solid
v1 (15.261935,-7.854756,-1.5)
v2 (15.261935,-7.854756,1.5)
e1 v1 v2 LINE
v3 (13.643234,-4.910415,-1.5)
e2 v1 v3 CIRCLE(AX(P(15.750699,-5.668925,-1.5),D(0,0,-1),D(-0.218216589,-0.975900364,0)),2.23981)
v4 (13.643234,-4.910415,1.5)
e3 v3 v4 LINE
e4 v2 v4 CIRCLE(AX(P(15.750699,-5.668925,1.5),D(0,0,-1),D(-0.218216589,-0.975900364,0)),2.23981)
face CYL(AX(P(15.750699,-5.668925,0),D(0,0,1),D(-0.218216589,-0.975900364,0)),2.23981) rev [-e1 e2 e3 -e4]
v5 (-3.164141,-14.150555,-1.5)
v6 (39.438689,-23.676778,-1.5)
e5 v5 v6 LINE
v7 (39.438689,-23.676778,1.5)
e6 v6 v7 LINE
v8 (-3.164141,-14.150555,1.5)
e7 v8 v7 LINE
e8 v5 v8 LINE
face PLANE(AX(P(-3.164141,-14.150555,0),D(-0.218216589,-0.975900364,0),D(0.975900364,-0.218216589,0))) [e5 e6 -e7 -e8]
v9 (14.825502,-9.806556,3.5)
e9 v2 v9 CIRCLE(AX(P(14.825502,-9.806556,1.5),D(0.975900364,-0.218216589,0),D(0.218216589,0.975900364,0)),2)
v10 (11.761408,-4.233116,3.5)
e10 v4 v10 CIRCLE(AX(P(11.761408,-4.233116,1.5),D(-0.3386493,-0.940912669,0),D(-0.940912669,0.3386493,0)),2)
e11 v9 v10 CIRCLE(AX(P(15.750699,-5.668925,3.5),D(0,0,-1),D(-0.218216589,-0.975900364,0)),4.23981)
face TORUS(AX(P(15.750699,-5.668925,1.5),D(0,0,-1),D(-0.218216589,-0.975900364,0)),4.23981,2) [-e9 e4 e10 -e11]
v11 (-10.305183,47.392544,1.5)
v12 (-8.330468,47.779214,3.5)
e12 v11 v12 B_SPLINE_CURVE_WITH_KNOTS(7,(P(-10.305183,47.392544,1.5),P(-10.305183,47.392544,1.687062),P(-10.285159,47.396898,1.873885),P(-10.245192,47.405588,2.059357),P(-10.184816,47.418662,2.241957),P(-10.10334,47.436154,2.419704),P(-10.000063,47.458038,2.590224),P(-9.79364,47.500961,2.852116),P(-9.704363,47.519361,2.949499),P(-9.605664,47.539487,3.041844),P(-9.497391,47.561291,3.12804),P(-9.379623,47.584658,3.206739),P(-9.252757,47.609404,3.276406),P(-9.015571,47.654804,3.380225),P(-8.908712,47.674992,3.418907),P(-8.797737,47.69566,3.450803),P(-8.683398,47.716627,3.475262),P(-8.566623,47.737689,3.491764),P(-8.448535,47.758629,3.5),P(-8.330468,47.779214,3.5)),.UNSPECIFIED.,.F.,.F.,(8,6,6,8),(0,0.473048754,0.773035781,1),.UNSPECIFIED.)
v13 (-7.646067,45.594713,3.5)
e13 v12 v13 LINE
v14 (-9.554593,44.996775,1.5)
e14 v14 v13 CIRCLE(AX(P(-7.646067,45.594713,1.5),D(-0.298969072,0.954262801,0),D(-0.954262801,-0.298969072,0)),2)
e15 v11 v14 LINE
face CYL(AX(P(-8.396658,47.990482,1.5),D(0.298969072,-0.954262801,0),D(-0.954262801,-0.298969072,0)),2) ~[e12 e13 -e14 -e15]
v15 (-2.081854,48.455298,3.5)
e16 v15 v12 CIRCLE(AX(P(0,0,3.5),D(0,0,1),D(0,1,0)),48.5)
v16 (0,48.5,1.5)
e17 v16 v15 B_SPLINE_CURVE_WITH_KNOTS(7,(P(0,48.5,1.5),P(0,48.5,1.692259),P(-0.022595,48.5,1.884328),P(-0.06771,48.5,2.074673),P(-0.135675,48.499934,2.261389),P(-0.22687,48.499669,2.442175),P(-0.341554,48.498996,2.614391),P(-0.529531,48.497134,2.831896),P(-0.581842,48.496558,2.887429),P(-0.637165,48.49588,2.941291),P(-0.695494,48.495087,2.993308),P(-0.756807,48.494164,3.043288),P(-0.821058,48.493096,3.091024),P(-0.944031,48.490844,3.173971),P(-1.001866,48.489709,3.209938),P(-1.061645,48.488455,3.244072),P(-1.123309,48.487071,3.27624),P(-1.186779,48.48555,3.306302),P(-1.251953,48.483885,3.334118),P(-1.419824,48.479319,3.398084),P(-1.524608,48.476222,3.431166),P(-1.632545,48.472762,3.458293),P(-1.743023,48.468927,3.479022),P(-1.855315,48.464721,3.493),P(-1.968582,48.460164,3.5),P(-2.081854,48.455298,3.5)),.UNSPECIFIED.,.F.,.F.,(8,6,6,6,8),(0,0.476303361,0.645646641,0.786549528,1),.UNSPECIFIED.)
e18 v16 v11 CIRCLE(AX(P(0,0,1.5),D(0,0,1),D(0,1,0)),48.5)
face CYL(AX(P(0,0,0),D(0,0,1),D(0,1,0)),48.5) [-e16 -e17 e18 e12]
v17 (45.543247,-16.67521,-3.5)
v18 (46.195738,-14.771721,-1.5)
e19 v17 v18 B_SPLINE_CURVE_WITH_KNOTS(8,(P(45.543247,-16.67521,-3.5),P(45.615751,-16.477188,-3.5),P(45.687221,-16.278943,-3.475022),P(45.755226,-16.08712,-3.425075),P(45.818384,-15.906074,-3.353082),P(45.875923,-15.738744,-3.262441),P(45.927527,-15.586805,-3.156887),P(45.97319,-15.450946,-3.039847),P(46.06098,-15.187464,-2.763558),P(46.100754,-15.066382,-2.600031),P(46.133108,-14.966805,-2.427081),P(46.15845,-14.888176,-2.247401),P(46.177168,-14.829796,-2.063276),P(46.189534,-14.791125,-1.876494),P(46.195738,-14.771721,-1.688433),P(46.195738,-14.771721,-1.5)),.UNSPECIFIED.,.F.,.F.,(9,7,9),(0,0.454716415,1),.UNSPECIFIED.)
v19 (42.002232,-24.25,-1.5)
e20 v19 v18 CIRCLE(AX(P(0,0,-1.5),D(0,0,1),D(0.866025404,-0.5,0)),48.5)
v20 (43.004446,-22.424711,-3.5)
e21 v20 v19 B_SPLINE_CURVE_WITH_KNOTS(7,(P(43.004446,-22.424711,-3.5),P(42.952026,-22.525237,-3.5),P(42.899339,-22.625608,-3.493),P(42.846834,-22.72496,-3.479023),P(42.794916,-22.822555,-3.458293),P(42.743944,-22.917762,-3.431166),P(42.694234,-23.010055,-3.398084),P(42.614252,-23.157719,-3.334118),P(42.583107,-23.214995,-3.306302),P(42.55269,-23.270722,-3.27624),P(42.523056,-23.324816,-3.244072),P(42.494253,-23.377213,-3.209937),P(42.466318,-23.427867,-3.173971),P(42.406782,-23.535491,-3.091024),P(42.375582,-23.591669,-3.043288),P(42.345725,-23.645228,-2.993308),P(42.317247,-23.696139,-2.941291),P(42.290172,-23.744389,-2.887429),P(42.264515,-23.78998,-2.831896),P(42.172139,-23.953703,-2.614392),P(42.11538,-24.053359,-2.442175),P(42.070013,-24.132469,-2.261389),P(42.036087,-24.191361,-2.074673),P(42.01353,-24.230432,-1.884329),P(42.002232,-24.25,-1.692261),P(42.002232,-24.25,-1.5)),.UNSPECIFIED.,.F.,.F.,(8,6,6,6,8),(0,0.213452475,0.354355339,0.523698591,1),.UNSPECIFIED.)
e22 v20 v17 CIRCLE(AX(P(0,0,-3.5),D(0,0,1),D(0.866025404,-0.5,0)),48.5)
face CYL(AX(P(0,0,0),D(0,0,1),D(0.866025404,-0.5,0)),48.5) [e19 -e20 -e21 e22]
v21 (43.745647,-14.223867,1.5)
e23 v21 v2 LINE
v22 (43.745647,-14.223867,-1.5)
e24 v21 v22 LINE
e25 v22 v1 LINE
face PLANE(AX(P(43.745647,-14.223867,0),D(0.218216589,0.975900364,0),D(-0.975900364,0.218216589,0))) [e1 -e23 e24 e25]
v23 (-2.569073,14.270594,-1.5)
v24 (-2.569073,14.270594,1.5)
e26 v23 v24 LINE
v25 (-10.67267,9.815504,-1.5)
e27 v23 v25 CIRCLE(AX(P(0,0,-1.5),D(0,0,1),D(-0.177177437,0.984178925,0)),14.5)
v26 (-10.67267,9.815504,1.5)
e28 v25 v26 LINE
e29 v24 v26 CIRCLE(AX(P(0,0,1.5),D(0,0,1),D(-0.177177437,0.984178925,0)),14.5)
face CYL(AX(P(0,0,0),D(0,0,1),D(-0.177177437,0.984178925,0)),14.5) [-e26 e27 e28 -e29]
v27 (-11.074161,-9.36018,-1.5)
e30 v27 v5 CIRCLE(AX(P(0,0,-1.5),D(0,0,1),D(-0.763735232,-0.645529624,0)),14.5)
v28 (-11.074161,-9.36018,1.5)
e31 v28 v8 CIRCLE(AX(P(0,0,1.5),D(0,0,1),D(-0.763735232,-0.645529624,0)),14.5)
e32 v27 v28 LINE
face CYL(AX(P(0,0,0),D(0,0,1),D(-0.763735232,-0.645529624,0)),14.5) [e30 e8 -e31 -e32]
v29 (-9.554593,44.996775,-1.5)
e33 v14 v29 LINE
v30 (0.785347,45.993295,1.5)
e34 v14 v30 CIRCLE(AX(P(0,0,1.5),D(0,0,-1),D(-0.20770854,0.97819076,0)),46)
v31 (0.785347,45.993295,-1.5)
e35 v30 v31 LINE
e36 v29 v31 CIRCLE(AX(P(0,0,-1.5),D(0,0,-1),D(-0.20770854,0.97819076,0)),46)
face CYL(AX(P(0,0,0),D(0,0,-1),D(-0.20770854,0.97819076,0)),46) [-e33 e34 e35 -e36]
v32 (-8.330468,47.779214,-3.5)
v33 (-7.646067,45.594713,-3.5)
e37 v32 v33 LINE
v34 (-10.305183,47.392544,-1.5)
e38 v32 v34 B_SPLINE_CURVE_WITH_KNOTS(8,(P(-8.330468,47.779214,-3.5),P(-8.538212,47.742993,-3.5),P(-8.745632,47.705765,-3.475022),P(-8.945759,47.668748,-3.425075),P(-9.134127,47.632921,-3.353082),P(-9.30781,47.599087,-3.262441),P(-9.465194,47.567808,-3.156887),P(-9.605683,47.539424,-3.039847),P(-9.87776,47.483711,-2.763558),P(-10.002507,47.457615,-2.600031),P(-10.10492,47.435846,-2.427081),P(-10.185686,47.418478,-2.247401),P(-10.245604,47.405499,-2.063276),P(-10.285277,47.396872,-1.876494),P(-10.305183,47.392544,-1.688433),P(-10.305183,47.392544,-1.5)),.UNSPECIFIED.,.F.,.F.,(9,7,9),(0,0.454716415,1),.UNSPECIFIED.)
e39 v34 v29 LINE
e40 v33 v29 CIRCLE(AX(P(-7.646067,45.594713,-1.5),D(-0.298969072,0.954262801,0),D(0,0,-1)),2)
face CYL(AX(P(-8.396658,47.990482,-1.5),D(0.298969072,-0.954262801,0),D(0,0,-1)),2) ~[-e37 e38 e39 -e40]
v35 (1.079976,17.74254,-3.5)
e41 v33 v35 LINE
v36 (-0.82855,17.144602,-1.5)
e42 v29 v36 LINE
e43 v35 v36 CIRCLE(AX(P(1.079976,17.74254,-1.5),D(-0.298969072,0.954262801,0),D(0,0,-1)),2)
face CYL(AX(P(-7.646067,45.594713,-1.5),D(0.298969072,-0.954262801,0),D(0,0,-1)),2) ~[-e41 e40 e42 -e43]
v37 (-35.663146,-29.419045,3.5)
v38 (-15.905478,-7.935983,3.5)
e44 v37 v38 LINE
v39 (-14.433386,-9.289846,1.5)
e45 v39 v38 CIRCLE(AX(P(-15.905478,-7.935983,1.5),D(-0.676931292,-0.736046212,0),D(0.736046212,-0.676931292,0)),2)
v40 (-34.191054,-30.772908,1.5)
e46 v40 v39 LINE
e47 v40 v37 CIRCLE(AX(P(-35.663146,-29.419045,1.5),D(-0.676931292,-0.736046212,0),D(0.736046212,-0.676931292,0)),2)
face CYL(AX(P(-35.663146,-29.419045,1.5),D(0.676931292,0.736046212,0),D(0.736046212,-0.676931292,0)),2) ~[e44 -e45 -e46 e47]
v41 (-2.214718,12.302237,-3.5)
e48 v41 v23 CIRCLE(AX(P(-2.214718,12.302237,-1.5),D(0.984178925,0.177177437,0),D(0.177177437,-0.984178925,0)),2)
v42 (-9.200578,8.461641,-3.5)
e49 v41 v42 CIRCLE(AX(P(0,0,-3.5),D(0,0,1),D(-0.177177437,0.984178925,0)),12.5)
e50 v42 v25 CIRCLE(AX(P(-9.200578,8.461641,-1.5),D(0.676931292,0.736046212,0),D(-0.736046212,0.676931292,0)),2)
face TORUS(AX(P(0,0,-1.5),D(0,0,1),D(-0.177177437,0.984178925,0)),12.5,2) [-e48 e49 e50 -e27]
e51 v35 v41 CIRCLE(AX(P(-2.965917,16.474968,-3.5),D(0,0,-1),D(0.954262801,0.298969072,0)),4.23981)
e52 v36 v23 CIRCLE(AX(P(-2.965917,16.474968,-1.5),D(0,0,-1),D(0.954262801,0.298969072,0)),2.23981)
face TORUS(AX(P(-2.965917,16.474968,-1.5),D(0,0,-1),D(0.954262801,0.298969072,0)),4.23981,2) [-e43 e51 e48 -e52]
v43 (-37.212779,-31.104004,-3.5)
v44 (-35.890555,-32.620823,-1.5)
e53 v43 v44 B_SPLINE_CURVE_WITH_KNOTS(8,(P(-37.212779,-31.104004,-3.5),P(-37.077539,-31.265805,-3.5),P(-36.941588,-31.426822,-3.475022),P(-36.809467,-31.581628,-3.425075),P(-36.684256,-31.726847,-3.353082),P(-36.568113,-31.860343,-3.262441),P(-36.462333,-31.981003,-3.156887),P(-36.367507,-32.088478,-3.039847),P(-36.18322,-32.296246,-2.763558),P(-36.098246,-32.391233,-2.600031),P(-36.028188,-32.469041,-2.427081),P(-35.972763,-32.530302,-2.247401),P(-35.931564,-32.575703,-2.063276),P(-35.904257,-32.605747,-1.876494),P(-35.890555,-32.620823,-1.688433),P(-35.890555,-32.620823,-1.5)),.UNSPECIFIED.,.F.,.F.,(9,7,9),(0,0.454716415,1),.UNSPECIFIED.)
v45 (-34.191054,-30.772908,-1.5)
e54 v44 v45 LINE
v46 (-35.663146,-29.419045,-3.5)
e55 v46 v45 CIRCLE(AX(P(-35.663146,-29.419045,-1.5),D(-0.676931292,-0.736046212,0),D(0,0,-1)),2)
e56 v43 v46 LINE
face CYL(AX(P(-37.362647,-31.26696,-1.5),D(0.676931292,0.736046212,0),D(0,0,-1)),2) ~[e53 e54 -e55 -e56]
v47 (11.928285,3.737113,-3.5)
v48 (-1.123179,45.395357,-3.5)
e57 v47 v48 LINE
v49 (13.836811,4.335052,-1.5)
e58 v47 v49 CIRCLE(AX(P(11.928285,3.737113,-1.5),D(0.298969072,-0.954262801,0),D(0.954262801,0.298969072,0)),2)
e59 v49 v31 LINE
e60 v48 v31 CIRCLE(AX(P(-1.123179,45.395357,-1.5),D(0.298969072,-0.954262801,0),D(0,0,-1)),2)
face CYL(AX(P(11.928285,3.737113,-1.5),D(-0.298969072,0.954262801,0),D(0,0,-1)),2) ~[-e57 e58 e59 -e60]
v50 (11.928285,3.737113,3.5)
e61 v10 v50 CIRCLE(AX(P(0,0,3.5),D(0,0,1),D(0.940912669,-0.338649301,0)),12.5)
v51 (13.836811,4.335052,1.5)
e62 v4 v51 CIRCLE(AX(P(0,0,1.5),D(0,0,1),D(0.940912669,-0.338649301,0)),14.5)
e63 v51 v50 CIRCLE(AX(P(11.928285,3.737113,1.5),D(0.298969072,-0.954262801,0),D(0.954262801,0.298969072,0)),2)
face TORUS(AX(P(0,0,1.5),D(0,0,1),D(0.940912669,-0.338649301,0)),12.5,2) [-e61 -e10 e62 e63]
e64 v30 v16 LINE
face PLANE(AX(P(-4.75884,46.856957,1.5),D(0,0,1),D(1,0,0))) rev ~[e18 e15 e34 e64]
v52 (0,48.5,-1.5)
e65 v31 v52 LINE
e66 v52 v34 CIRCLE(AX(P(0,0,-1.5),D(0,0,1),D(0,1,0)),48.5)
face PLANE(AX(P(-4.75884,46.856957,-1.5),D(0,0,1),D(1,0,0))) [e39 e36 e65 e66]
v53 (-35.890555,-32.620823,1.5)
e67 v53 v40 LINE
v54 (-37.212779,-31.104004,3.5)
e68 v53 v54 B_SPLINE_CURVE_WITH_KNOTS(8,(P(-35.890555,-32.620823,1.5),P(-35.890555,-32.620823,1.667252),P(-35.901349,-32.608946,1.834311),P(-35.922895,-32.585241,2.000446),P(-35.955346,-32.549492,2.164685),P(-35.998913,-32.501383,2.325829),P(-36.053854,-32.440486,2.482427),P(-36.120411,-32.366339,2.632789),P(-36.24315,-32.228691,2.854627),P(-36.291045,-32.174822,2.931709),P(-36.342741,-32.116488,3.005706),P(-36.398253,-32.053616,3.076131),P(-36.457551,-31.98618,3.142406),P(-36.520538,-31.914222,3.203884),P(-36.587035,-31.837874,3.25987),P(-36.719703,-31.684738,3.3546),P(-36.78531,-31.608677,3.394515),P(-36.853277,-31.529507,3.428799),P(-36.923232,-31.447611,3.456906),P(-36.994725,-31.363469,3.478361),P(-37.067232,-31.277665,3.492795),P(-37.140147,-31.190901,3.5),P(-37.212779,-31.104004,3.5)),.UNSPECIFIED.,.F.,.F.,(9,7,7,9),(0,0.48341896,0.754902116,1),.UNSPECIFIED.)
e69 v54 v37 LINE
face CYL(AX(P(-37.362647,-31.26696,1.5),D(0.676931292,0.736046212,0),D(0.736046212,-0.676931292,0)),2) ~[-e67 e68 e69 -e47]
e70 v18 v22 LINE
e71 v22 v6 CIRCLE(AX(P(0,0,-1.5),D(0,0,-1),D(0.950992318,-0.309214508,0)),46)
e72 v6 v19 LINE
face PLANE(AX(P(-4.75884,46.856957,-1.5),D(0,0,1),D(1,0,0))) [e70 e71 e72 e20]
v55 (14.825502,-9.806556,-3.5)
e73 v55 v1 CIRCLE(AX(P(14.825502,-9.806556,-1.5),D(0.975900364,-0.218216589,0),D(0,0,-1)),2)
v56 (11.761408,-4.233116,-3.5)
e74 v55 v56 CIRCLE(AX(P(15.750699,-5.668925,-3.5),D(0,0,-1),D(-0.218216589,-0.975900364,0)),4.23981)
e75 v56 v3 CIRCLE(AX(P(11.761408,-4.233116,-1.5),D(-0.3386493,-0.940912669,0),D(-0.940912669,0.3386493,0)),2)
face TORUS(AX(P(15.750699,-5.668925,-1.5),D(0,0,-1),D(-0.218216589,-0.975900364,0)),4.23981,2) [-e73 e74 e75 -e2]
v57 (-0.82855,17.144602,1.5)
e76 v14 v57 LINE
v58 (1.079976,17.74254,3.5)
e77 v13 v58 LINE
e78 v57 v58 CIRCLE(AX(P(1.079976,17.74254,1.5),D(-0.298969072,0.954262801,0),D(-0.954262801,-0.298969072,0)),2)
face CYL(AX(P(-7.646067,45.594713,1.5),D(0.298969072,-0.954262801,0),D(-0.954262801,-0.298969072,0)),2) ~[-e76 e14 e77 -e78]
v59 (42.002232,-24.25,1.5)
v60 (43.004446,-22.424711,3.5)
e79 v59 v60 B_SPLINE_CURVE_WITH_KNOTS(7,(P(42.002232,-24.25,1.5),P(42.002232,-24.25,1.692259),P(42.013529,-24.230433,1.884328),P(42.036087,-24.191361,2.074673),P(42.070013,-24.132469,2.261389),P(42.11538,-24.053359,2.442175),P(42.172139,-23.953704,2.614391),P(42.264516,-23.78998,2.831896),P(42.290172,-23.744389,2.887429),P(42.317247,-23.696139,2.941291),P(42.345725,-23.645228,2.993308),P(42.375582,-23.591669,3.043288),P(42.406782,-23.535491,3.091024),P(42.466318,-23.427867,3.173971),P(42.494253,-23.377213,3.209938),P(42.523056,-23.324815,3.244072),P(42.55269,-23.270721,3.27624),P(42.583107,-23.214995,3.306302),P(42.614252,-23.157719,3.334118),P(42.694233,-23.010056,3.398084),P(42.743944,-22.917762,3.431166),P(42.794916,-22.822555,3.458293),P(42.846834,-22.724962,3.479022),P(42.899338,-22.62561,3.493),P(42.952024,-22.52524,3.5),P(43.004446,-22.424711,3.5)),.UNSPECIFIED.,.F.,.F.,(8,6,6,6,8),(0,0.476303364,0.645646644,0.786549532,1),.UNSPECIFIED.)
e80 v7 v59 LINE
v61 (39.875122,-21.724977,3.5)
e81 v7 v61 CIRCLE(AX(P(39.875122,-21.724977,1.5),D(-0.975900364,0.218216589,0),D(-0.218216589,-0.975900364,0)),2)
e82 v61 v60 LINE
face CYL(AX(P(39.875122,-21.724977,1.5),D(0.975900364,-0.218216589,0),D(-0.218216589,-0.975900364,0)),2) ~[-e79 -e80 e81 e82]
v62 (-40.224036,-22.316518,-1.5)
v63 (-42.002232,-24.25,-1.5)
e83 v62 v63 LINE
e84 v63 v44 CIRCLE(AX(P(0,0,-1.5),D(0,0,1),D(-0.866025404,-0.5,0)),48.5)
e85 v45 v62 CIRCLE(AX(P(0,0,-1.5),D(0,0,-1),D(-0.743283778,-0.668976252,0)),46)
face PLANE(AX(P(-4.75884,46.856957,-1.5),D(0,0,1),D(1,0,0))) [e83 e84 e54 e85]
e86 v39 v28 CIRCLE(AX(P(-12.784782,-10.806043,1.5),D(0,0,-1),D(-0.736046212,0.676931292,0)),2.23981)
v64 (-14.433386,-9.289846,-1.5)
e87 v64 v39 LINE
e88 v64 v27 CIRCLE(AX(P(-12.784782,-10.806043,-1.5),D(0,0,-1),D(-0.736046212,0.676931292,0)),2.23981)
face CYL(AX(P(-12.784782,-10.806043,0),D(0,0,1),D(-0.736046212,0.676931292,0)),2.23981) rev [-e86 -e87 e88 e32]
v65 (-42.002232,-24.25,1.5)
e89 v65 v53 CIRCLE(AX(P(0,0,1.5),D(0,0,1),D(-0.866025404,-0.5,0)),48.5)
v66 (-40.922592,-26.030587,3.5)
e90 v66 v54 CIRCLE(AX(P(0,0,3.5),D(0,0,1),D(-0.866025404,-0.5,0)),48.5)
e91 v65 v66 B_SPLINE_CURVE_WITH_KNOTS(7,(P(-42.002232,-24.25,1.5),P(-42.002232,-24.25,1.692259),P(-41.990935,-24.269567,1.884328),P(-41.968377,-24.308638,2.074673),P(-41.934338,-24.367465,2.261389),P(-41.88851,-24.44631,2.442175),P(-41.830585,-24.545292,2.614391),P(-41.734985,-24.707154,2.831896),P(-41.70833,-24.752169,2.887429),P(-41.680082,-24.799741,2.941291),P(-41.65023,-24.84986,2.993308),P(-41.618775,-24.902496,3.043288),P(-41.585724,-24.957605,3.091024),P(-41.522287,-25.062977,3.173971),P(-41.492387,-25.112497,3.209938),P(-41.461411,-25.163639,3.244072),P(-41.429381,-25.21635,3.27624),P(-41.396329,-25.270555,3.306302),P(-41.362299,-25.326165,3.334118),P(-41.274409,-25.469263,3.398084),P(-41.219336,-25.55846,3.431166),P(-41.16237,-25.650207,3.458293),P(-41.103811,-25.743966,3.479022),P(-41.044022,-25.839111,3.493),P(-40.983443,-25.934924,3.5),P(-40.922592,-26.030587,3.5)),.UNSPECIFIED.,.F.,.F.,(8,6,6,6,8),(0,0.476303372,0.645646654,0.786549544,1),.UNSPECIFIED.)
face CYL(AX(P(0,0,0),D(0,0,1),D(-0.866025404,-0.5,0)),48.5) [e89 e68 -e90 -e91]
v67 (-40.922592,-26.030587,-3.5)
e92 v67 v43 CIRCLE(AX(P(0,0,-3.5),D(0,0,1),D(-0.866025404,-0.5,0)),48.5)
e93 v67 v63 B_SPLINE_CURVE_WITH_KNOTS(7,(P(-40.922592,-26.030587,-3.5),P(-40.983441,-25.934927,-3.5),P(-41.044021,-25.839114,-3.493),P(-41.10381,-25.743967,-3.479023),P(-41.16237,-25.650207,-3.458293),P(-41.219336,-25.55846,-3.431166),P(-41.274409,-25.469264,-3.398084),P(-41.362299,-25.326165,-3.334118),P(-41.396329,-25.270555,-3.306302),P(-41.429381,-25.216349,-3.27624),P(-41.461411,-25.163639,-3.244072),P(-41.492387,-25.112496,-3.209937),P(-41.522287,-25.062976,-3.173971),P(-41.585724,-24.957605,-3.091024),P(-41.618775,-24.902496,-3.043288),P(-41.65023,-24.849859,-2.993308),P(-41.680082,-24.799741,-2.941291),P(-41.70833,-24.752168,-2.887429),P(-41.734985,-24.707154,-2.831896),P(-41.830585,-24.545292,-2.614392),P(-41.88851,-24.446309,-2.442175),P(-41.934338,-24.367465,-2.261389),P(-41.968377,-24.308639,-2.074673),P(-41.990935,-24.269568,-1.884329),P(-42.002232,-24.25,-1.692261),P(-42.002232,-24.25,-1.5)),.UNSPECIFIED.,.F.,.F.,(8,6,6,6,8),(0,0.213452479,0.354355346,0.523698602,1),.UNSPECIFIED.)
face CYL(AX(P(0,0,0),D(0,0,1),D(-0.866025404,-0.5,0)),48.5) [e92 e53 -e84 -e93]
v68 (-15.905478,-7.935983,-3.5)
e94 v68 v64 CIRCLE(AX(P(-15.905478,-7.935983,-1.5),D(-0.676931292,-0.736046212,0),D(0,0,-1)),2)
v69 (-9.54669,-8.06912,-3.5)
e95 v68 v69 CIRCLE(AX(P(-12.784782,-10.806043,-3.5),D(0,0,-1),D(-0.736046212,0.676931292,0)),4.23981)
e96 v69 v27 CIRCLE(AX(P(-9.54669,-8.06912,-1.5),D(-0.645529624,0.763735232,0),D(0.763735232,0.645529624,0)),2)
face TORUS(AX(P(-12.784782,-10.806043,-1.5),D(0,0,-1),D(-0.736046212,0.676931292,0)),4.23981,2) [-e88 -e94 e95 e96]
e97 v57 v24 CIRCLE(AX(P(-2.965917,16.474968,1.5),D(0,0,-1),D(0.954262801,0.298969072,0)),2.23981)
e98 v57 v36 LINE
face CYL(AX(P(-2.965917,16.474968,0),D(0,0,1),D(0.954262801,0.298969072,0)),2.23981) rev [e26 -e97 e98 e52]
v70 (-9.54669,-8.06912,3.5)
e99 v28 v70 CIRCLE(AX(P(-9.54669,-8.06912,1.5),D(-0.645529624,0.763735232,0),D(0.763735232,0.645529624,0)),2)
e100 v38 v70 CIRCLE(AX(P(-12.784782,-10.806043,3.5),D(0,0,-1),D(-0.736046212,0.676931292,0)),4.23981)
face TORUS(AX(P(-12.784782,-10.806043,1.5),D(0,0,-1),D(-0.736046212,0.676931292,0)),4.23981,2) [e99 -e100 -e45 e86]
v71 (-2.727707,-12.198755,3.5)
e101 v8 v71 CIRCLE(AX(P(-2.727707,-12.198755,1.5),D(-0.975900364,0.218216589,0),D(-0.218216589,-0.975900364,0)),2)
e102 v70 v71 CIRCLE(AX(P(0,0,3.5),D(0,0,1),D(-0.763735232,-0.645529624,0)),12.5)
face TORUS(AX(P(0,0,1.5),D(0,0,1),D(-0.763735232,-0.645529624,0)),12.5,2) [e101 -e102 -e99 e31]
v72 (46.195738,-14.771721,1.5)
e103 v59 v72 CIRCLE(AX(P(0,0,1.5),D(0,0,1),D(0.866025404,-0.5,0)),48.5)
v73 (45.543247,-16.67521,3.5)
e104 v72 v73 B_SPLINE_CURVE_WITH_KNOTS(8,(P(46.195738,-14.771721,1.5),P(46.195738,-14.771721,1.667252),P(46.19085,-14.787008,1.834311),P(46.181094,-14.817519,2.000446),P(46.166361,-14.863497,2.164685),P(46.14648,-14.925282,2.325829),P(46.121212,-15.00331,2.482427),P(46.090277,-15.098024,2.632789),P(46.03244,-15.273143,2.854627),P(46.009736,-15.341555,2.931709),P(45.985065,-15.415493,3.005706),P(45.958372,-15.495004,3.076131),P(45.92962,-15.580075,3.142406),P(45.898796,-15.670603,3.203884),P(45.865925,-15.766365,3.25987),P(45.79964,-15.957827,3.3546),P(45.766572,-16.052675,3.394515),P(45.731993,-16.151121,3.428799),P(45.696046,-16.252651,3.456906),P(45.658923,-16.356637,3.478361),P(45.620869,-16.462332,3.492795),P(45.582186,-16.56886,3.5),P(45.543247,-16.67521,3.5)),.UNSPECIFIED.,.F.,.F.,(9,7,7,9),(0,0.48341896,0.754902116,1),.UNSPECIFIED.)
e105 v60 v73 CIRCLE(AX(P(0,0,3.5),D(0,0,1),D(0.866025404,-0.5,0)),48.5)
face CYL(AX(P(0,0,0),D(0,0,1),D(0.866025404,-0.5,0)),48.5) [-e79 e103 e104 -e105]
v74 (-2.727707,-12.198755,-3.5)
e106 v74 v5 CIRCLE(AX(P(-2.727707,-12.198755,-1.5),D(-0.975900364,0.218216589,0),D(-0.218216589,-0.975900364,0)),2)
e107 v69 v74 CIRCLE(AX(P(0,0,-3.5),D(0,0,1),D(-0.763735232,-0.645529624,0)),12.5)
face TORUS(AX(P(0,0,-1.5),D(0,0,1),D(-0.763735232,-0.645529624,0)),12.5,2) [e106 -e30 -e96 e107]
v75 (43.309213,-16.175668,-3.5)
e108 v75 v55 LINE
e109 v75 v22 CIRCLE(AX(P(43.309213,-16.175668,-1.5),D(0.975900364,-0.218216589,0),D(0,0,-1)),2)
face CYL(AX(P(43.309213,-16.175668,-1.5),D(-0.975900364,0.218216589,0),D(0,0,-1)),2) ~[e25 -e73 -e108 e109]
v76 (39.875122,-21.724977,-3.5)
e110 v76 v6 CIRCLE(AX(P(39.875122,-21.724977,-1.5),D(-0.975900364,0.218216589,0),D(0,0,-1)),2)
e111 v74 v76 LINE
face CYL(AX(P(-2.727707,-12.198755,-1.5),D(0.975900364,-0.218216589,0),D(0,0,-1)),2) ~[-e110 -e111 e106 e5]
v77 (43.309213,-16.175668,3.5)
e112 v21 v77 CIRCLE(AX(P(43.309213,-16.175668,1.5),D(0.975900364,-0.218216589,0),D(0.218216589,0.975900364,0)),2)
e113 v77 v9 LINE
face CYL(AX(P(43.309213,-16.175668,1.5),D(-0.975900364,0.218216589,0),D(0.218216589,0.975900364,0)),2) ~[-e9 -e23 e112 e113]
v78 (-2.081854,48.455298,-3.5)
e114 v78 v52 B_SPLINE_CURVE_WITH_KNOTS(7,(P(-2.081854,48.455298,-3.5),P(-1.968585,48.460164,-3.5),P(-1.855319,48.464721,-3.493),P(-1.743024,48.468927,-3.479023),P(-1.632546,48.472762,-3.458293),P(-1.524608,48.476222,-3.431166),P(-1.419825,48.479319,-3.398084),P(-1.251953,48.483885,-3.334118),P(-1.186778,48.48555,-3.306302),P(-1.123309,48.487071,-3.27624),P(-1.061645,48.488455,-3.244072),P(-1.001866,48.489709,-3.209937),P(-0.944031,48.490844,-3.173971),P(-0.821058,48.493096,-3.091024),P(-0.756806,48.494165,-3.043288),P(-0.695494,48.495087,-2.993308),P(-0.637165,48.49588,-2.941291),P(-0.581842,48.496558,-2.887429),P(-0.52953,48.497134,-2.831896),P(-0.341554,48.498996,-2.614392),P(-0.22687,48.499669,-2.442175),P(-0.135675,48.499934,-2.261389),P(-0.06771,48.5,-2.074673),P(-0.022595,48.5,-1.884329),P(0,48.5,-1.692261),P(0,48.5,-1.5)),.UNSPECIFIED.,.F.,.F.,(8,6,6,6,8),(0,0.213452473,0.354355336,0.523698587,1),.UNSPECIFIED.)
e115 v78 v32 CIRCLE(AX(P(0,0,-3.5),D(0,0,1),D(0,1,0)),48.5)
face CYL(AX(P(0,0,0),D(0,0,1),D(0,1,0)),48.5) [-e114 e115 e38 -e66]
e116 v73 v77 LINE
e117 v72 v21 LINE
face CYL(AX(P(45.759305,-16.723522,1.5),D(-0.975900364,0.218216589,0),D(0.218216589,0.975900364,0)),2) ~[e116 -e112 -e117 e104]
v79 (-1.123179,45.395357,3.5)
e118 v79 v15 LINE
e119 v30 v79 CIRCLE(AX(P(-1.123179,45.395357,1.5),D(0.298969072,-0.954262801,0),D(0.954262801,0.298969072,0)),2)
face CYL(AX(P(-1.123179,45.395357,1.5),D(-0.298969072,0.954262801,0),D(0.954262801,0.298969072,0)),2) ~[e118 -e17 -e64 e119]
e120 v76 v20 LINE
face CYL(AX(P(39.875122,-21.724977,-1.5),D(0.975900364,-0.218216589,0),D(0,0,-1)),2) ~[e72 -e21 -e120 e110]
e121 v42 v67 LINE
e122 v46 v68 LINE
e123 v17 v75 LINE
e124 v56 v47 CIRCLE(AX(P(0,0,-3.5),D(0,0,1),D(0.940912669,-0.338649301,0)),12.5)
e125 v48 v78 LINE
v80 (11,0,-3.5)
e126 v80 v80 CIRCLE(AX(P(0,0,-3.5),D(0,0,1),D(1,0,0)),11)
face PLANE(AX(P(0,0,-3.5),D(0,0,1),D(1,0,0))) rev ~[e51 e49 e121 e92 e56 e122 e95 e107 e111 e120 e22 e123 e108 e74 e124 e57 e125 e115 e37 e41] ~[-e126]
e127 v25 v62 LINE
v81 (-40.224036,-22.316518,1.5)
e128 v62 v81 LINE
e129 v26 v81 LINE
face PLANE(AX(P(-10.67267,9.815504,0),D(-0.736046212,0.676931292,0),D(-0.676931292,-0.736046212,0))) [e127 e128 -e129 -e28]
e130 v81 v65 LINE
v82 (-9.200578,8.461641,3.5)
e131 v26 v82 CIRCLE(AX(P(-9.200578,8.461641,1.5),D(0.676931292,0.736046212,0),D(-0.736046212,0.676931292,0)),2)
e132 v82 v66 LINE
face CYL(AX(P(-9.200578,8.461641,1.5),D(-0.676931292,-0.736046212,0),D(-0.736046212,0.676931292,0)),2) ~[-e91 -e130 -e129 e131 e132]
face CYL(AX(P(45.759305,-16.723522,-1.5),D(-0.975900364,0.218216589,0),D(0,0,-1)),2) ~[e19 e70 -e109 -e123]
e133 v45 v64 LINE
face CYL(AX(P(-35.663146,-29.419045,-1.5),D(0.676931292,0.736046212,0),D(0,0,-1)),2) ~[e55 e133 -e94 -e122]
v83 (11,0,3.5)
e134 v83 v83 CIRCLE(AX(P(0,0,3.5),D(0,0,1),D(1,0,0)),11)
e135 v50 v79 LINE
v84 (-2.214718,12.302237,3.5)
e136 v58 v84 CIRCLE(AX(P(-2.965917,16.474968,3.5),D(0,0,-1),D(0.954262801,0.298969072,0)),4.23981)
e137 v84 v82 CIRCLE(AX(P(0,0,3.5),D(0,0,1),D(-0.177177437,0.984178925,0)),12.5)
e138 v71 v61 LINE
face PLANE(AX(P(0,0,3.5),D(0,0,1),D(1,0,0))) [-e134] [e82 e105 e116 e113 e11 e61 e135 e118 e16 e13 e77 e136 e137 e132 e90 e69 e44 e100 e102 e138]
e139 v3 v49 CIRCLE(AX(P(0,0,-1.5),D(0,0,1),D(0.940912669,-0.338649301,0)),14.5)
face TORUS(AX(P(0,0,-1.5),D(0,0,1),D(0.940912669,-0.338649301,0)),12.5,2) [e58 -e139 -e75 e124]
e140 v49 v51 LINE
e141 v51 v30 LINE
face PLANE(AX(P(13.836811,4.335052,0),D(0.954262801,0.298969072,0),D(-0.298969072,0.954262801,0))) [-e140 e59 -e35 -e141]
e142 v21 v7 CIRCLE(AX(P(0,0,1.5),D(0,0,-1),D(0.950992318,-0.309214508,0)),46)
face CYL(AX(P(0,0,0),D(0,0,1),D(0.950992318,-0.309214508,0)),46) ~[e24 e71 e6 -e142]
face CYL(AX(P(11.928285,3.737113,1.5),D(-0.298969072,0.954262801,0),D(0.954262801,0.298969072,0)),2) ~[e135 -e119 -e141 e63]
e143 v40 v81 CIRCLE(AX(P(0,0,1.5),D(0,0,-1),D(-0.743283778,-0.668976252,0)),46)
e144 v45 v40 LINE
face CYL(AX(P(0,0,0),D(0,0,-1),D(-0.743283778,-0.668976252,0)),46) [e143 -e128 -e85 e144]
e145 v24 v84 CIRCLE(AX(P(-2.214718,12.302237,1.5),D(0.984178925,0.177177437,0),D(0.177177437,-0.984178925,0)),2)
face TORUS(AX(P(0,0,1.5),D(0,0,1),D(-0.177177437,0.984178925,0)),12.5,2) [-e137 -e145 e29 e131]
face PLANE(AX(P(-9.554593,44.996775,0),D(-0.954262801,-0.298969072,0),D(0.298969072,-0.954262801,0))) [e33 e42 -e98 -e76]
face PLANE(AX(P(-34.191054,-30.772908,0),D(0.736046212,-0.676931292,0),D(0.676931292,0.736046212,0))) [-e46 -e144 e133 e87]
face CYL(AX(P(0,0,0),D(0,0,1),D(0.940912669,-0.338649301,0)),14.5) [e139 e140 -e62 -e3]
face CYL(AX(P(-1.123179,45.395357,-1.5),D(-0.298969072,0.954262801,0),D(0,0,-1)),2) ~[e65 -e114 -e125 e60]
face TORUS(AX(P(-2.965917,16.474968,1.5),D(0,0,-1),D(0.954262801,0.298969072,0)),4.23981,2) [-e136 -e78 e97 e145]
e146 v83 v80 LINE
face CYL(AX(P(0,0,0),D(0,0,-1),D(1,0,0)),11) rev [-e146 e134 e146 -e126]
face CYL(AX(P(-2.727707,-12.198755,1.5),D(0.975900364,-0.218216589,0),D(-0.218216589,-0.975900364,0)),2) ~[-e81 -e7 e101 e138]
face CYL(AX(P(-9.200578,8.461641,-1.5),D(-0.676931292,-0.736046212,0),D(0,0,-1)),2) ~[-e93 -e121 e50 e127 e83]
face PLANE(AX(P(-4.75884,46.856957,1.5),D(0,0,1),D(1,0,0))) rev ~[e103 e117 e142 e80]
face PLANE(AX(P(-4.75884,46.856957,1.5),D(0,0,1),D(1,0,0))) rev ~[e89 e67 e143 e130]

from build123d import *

# Parameters (mm, degrees)
F0_R     = 11
F1_DEPTH = 3.5
F2_R     = 2
F3_R     = 2
F4_DEPTH = 1.5


with BuildPart() as f1:
    # F0 (on Top) → F1 (new body, symmetric)
    with BuildSketch(Plane.XY):
        with BuildLine():
            ThreePointArc((-0.8285496132, 17.1446015607), (-1.0500524725, 15.314704152), (-2.5690728422, 14.2705944071))
            ThreePointArc((-2.5690728422, 14.2705944071), (-6.985549163, 12.7063804009), (-10.6726700751, 9.8155037297))
            Line((-10.6726700751, 9.8155037297), (-40.2240356418, -22.3165175753))
            ThreePointArc((-40.2240356418, -22.3165175753), (-37.447016124, -26.7155569548), (-34.1910537852, -30.7729075821))
            Line((-34.1910537852, -30.7729075821), (-14.4333856827, -9.2898457936))
            ThreePointArc((-14.4333856827, -9.2898457936), (-12.7378966108, -8.5667241925), (-11.0741608625, -9.3601795491))
            ThreePointArc((-11.0741608625, -9.3601795491), (-7.5112736358, -12.4028532349), (-3.1641405433, -14.1505552761))
            Line((-3.1641405433, -14.1505552761), (39.4386889651, -23.6767779209))
            ThreePointArc((39.4386889651, -23.6767779209), (41.8598590611, -19.0722887819), (43.745646607, -14.2238673691))
            Line((43.745646607, -14.2238673691), (15.2619352959, -7.8547557671))
            ThreePointArc((15.2619352959, -7.8547557671), (13.7879490833, -6.7479799595), (13.6432337047, -4.910414858))
            ThreePointArc((13.6432337047, -4.910414858), (14.4968227988, -0.3035271659), (13.8368106184, 4.3350515464))
            Line((13.8368106184, 4.3350515464), (0.7853466767, 45.9932954962))
            ThreePointArc((0.7853466767, 45.9932954962), (-4.4128429371, 45.7878457368), (-9.5545928219, 44.9967749512))
            Line((-9.5545928219, 44.9967749512), (-0.8285496132, 17.1446015607))
        make_face()
        Circle(F0_R, mode=Mode.SUBTRACT)
        with BuildLine():
            Line((-10.3051834804, 47.3925436481), (-9.5545928219, 44.9967749512))
            ThreePointArc((-9.5545928219, 44.9967749512), (-4.4128429371, 45.7878457368), (0.7853466767, 45.9932954962))
            Line((0.7853466767, 45.9932954962), (0, 48.5))
            ThreePointArc((0, 48.5), (-5.1822597903, 48.2223411239), (-10.3051834804, 47.3925436481))
        make_face()
        with BuildLine():
            ThreePointArc((43.745646607, -14.2238673691), (41.8598590611, -19.0722887819), (39.4386889651, -23.6767779209))
            Line((39.4386889651, -23.6767779209), (42.0022320835, -24.25))
            ThreePointArc((42.0022320835, -24.25), (44.3529023384, -19.6232019345), (46.1957384894, -14.7717211394))
            Line((46.1957384894, -14.7717211394), (43.745646607, -14.2238673691))
        make_face()
        with BuildLine():
            ThreePointArc((-34.1910537852, -30.7729075821), (-37.447016124, -26.7155569548), (-40.2240356418, -22.3165175753))
            Line((-40.2240356418, -22.3165175753), (-42.0022320835, -24.25))
            ThreePointArc((-42.0022320835, -24.25), (-39.1706425481, -28.5991391893), (-35.890555009, -32.6208225087))
            Line((-35.890555009, -32.6208225087), (-34.1910537852, -30.7729075821))
        make_face()
    extrude(amount=F1_DEPTH, both=True)

    # F2
    f2_edges = [f1.edges().sort_by_distance(p)[0] for p in [
        (-26.337451, -7.217248, 3.5),
        (-6.985549, 12.70638, 3.5),
        (-1.050052, 15.314704, 3.5),
        (-5.566867, 32.268573, 3.5),
        (6.918405, 26.417526, 3.5),
        (14.496823, -0.303527, 3.5),
        (13.787949, -6.74798, 3.5),
        (30.728837, -11.313238, 3.5),
        (19.419046, -19.200278, 3.5),
        (-7.511274, -12.402853, 3.5),
        (-12.737897, -8.566724, 3.5),
        (-25.16197, -20.955334, 3.5),
    ]]
    fillet(f2_edges, radius=F2_R)

    # F3
    f3_edges = [f1.edges().sort_by_distance(p)[0] for p in [
        (-26.337451, -7.217248, -3.5),
        (-6.985549, 12.70638, -3.5),
        (-1.050052, 15.314704, -3.5),
        (-5.566867, 32.268573, -3.5),
        (6.918405, 26.417526, -3.5),
        (14.496823, -0.303527, -3.5),
        (13.787949, -6.74798, -3.5),
        (30.728837, -11.313238, -3.5),
        (19.419046, -19.200278, -3.5),
        (-7.511274, -12.402853, -3.5),
        (-12.737897, -8.566724, -3.5),
        (-25.16197, -20.955334, -3.5),
    ]]
    fillet(f3_edges, radius=F3_R)


with BuildPart() as f4:
    # F0 (on Top) → F4 (new body, symmetric)
    with BuildSketch(Plane.XY):
        with BuildLine():
            Line((-10.3051834804, 47.3925436481), (-9.5545928219, 44.9967749512))
            ThreePointArc((-9.5545928219, 44.9967749512), (-4.4128429371, 45.7878457368), (0.7853466767, 45.9932954962))
            Line((0.7853466767, 45.9932954962), (0, 48.5))
            ThreePointArc((0, 48.5), (-5.1822597903, 48.2223411239), (-10.3051834804, 47.3925436481))
        make_face()
        with BuildLine():
            Line((-42.0022320835, -24.25), (-40.2240356418, -22.3165175753))
            ThreePointArc((-40.2240356418, -22.3165175753), (-41.8598590611, 19.0722887819), (-9.5545928219, 44.9967749512))
            Line((-9.5545928219, 44.9967749512), (-10.3051834804, 47.3925436481))
            ThreePointArc((-10.3051834804, 47.3925436481), (-44.3529023384, 19.6232019345), (-42.0022320835, -24.25))
        make_face()
        with BuildLine():
            ThreePointArc((-34.1910537852, -30.7729075821), (-37.447016124, -26.7155569548), (-40.2240356418, -22.3165175753))
            Line((-40.2240356418, -22.3165175753), (-42.0022320835, -24.25))
            ThreePointArc((-42.0022320835, -24.25), (-39.1706425481, -28.5991391893), (-35.890555009, -32.6208225087))
            Line((-35.890555009, -32.6208225087), (-34.1910537852, -30.7729075821))
        make_face()
        with BuildLine():
            ThreePointArc((39.4386889651, -23.6767779209), (4.4128429371, -45.7878457368), (-34.1910537852, -30.7729075821))
            Line((-34.1910537852, -30.7729075821), (-35.890555009, -32.6208225087))
            ThreePointArc((-35.890555009, -32.6208225087), (5.1822597903, -48.2223411239), (42.0022320835, -24.25))
            Line((42.0022320835, -24.25), (39.4386889651, -23.6767779209))
        make_face()
        with BuildLine():
            ThreePointArc((43.745646607, -14.2238673691), (41.8598590611, -19.0722887819), (39.4386889651, -23.6767779209))
            Line((39.4386889651, -23.6767779209), (42.0022320835, -24.25))
            ThreePointArc((42.0022320835, -24.25), (44.3529023384, -19.6232019345), (46.1957384894, -14.7717211394))
            Line((46.1957384894, -14.7717211394), (43.745646607, -14.2238673691))
        make_face()
        with BuildLine():
            Line((0, 48.5), (0.7853466767, 45.9932954962))
            ThreePointArc((0.7853466767, 45.9932954962), (32.8033988112, 32.2480546147), (46, 0))
            ThreePointArc((46, 0), (45.4329161728, -7.2007033016), (43.745646607, -14.2238673691))
            Line((43.745646607, -14.2238673691), (46.1957384894, -14.7717211394))
            ThreePointArc((46.1957384894, -14.7717211394), (47.9204722261, -7.4751817123), (48.5, 0))
            ThreePointArc((48.5, 0), (34.2946788875, 34.2946788875), (0, 48.5))
        make_face()
    extrude(amount=F4_DEPTH, both=True)


with BuildPart() as f1_1:
    add(f1.part)

    # F5: cut F4
    add(f4.part, mode=Mode.SUBTRACT)


solid = f1_1.part
